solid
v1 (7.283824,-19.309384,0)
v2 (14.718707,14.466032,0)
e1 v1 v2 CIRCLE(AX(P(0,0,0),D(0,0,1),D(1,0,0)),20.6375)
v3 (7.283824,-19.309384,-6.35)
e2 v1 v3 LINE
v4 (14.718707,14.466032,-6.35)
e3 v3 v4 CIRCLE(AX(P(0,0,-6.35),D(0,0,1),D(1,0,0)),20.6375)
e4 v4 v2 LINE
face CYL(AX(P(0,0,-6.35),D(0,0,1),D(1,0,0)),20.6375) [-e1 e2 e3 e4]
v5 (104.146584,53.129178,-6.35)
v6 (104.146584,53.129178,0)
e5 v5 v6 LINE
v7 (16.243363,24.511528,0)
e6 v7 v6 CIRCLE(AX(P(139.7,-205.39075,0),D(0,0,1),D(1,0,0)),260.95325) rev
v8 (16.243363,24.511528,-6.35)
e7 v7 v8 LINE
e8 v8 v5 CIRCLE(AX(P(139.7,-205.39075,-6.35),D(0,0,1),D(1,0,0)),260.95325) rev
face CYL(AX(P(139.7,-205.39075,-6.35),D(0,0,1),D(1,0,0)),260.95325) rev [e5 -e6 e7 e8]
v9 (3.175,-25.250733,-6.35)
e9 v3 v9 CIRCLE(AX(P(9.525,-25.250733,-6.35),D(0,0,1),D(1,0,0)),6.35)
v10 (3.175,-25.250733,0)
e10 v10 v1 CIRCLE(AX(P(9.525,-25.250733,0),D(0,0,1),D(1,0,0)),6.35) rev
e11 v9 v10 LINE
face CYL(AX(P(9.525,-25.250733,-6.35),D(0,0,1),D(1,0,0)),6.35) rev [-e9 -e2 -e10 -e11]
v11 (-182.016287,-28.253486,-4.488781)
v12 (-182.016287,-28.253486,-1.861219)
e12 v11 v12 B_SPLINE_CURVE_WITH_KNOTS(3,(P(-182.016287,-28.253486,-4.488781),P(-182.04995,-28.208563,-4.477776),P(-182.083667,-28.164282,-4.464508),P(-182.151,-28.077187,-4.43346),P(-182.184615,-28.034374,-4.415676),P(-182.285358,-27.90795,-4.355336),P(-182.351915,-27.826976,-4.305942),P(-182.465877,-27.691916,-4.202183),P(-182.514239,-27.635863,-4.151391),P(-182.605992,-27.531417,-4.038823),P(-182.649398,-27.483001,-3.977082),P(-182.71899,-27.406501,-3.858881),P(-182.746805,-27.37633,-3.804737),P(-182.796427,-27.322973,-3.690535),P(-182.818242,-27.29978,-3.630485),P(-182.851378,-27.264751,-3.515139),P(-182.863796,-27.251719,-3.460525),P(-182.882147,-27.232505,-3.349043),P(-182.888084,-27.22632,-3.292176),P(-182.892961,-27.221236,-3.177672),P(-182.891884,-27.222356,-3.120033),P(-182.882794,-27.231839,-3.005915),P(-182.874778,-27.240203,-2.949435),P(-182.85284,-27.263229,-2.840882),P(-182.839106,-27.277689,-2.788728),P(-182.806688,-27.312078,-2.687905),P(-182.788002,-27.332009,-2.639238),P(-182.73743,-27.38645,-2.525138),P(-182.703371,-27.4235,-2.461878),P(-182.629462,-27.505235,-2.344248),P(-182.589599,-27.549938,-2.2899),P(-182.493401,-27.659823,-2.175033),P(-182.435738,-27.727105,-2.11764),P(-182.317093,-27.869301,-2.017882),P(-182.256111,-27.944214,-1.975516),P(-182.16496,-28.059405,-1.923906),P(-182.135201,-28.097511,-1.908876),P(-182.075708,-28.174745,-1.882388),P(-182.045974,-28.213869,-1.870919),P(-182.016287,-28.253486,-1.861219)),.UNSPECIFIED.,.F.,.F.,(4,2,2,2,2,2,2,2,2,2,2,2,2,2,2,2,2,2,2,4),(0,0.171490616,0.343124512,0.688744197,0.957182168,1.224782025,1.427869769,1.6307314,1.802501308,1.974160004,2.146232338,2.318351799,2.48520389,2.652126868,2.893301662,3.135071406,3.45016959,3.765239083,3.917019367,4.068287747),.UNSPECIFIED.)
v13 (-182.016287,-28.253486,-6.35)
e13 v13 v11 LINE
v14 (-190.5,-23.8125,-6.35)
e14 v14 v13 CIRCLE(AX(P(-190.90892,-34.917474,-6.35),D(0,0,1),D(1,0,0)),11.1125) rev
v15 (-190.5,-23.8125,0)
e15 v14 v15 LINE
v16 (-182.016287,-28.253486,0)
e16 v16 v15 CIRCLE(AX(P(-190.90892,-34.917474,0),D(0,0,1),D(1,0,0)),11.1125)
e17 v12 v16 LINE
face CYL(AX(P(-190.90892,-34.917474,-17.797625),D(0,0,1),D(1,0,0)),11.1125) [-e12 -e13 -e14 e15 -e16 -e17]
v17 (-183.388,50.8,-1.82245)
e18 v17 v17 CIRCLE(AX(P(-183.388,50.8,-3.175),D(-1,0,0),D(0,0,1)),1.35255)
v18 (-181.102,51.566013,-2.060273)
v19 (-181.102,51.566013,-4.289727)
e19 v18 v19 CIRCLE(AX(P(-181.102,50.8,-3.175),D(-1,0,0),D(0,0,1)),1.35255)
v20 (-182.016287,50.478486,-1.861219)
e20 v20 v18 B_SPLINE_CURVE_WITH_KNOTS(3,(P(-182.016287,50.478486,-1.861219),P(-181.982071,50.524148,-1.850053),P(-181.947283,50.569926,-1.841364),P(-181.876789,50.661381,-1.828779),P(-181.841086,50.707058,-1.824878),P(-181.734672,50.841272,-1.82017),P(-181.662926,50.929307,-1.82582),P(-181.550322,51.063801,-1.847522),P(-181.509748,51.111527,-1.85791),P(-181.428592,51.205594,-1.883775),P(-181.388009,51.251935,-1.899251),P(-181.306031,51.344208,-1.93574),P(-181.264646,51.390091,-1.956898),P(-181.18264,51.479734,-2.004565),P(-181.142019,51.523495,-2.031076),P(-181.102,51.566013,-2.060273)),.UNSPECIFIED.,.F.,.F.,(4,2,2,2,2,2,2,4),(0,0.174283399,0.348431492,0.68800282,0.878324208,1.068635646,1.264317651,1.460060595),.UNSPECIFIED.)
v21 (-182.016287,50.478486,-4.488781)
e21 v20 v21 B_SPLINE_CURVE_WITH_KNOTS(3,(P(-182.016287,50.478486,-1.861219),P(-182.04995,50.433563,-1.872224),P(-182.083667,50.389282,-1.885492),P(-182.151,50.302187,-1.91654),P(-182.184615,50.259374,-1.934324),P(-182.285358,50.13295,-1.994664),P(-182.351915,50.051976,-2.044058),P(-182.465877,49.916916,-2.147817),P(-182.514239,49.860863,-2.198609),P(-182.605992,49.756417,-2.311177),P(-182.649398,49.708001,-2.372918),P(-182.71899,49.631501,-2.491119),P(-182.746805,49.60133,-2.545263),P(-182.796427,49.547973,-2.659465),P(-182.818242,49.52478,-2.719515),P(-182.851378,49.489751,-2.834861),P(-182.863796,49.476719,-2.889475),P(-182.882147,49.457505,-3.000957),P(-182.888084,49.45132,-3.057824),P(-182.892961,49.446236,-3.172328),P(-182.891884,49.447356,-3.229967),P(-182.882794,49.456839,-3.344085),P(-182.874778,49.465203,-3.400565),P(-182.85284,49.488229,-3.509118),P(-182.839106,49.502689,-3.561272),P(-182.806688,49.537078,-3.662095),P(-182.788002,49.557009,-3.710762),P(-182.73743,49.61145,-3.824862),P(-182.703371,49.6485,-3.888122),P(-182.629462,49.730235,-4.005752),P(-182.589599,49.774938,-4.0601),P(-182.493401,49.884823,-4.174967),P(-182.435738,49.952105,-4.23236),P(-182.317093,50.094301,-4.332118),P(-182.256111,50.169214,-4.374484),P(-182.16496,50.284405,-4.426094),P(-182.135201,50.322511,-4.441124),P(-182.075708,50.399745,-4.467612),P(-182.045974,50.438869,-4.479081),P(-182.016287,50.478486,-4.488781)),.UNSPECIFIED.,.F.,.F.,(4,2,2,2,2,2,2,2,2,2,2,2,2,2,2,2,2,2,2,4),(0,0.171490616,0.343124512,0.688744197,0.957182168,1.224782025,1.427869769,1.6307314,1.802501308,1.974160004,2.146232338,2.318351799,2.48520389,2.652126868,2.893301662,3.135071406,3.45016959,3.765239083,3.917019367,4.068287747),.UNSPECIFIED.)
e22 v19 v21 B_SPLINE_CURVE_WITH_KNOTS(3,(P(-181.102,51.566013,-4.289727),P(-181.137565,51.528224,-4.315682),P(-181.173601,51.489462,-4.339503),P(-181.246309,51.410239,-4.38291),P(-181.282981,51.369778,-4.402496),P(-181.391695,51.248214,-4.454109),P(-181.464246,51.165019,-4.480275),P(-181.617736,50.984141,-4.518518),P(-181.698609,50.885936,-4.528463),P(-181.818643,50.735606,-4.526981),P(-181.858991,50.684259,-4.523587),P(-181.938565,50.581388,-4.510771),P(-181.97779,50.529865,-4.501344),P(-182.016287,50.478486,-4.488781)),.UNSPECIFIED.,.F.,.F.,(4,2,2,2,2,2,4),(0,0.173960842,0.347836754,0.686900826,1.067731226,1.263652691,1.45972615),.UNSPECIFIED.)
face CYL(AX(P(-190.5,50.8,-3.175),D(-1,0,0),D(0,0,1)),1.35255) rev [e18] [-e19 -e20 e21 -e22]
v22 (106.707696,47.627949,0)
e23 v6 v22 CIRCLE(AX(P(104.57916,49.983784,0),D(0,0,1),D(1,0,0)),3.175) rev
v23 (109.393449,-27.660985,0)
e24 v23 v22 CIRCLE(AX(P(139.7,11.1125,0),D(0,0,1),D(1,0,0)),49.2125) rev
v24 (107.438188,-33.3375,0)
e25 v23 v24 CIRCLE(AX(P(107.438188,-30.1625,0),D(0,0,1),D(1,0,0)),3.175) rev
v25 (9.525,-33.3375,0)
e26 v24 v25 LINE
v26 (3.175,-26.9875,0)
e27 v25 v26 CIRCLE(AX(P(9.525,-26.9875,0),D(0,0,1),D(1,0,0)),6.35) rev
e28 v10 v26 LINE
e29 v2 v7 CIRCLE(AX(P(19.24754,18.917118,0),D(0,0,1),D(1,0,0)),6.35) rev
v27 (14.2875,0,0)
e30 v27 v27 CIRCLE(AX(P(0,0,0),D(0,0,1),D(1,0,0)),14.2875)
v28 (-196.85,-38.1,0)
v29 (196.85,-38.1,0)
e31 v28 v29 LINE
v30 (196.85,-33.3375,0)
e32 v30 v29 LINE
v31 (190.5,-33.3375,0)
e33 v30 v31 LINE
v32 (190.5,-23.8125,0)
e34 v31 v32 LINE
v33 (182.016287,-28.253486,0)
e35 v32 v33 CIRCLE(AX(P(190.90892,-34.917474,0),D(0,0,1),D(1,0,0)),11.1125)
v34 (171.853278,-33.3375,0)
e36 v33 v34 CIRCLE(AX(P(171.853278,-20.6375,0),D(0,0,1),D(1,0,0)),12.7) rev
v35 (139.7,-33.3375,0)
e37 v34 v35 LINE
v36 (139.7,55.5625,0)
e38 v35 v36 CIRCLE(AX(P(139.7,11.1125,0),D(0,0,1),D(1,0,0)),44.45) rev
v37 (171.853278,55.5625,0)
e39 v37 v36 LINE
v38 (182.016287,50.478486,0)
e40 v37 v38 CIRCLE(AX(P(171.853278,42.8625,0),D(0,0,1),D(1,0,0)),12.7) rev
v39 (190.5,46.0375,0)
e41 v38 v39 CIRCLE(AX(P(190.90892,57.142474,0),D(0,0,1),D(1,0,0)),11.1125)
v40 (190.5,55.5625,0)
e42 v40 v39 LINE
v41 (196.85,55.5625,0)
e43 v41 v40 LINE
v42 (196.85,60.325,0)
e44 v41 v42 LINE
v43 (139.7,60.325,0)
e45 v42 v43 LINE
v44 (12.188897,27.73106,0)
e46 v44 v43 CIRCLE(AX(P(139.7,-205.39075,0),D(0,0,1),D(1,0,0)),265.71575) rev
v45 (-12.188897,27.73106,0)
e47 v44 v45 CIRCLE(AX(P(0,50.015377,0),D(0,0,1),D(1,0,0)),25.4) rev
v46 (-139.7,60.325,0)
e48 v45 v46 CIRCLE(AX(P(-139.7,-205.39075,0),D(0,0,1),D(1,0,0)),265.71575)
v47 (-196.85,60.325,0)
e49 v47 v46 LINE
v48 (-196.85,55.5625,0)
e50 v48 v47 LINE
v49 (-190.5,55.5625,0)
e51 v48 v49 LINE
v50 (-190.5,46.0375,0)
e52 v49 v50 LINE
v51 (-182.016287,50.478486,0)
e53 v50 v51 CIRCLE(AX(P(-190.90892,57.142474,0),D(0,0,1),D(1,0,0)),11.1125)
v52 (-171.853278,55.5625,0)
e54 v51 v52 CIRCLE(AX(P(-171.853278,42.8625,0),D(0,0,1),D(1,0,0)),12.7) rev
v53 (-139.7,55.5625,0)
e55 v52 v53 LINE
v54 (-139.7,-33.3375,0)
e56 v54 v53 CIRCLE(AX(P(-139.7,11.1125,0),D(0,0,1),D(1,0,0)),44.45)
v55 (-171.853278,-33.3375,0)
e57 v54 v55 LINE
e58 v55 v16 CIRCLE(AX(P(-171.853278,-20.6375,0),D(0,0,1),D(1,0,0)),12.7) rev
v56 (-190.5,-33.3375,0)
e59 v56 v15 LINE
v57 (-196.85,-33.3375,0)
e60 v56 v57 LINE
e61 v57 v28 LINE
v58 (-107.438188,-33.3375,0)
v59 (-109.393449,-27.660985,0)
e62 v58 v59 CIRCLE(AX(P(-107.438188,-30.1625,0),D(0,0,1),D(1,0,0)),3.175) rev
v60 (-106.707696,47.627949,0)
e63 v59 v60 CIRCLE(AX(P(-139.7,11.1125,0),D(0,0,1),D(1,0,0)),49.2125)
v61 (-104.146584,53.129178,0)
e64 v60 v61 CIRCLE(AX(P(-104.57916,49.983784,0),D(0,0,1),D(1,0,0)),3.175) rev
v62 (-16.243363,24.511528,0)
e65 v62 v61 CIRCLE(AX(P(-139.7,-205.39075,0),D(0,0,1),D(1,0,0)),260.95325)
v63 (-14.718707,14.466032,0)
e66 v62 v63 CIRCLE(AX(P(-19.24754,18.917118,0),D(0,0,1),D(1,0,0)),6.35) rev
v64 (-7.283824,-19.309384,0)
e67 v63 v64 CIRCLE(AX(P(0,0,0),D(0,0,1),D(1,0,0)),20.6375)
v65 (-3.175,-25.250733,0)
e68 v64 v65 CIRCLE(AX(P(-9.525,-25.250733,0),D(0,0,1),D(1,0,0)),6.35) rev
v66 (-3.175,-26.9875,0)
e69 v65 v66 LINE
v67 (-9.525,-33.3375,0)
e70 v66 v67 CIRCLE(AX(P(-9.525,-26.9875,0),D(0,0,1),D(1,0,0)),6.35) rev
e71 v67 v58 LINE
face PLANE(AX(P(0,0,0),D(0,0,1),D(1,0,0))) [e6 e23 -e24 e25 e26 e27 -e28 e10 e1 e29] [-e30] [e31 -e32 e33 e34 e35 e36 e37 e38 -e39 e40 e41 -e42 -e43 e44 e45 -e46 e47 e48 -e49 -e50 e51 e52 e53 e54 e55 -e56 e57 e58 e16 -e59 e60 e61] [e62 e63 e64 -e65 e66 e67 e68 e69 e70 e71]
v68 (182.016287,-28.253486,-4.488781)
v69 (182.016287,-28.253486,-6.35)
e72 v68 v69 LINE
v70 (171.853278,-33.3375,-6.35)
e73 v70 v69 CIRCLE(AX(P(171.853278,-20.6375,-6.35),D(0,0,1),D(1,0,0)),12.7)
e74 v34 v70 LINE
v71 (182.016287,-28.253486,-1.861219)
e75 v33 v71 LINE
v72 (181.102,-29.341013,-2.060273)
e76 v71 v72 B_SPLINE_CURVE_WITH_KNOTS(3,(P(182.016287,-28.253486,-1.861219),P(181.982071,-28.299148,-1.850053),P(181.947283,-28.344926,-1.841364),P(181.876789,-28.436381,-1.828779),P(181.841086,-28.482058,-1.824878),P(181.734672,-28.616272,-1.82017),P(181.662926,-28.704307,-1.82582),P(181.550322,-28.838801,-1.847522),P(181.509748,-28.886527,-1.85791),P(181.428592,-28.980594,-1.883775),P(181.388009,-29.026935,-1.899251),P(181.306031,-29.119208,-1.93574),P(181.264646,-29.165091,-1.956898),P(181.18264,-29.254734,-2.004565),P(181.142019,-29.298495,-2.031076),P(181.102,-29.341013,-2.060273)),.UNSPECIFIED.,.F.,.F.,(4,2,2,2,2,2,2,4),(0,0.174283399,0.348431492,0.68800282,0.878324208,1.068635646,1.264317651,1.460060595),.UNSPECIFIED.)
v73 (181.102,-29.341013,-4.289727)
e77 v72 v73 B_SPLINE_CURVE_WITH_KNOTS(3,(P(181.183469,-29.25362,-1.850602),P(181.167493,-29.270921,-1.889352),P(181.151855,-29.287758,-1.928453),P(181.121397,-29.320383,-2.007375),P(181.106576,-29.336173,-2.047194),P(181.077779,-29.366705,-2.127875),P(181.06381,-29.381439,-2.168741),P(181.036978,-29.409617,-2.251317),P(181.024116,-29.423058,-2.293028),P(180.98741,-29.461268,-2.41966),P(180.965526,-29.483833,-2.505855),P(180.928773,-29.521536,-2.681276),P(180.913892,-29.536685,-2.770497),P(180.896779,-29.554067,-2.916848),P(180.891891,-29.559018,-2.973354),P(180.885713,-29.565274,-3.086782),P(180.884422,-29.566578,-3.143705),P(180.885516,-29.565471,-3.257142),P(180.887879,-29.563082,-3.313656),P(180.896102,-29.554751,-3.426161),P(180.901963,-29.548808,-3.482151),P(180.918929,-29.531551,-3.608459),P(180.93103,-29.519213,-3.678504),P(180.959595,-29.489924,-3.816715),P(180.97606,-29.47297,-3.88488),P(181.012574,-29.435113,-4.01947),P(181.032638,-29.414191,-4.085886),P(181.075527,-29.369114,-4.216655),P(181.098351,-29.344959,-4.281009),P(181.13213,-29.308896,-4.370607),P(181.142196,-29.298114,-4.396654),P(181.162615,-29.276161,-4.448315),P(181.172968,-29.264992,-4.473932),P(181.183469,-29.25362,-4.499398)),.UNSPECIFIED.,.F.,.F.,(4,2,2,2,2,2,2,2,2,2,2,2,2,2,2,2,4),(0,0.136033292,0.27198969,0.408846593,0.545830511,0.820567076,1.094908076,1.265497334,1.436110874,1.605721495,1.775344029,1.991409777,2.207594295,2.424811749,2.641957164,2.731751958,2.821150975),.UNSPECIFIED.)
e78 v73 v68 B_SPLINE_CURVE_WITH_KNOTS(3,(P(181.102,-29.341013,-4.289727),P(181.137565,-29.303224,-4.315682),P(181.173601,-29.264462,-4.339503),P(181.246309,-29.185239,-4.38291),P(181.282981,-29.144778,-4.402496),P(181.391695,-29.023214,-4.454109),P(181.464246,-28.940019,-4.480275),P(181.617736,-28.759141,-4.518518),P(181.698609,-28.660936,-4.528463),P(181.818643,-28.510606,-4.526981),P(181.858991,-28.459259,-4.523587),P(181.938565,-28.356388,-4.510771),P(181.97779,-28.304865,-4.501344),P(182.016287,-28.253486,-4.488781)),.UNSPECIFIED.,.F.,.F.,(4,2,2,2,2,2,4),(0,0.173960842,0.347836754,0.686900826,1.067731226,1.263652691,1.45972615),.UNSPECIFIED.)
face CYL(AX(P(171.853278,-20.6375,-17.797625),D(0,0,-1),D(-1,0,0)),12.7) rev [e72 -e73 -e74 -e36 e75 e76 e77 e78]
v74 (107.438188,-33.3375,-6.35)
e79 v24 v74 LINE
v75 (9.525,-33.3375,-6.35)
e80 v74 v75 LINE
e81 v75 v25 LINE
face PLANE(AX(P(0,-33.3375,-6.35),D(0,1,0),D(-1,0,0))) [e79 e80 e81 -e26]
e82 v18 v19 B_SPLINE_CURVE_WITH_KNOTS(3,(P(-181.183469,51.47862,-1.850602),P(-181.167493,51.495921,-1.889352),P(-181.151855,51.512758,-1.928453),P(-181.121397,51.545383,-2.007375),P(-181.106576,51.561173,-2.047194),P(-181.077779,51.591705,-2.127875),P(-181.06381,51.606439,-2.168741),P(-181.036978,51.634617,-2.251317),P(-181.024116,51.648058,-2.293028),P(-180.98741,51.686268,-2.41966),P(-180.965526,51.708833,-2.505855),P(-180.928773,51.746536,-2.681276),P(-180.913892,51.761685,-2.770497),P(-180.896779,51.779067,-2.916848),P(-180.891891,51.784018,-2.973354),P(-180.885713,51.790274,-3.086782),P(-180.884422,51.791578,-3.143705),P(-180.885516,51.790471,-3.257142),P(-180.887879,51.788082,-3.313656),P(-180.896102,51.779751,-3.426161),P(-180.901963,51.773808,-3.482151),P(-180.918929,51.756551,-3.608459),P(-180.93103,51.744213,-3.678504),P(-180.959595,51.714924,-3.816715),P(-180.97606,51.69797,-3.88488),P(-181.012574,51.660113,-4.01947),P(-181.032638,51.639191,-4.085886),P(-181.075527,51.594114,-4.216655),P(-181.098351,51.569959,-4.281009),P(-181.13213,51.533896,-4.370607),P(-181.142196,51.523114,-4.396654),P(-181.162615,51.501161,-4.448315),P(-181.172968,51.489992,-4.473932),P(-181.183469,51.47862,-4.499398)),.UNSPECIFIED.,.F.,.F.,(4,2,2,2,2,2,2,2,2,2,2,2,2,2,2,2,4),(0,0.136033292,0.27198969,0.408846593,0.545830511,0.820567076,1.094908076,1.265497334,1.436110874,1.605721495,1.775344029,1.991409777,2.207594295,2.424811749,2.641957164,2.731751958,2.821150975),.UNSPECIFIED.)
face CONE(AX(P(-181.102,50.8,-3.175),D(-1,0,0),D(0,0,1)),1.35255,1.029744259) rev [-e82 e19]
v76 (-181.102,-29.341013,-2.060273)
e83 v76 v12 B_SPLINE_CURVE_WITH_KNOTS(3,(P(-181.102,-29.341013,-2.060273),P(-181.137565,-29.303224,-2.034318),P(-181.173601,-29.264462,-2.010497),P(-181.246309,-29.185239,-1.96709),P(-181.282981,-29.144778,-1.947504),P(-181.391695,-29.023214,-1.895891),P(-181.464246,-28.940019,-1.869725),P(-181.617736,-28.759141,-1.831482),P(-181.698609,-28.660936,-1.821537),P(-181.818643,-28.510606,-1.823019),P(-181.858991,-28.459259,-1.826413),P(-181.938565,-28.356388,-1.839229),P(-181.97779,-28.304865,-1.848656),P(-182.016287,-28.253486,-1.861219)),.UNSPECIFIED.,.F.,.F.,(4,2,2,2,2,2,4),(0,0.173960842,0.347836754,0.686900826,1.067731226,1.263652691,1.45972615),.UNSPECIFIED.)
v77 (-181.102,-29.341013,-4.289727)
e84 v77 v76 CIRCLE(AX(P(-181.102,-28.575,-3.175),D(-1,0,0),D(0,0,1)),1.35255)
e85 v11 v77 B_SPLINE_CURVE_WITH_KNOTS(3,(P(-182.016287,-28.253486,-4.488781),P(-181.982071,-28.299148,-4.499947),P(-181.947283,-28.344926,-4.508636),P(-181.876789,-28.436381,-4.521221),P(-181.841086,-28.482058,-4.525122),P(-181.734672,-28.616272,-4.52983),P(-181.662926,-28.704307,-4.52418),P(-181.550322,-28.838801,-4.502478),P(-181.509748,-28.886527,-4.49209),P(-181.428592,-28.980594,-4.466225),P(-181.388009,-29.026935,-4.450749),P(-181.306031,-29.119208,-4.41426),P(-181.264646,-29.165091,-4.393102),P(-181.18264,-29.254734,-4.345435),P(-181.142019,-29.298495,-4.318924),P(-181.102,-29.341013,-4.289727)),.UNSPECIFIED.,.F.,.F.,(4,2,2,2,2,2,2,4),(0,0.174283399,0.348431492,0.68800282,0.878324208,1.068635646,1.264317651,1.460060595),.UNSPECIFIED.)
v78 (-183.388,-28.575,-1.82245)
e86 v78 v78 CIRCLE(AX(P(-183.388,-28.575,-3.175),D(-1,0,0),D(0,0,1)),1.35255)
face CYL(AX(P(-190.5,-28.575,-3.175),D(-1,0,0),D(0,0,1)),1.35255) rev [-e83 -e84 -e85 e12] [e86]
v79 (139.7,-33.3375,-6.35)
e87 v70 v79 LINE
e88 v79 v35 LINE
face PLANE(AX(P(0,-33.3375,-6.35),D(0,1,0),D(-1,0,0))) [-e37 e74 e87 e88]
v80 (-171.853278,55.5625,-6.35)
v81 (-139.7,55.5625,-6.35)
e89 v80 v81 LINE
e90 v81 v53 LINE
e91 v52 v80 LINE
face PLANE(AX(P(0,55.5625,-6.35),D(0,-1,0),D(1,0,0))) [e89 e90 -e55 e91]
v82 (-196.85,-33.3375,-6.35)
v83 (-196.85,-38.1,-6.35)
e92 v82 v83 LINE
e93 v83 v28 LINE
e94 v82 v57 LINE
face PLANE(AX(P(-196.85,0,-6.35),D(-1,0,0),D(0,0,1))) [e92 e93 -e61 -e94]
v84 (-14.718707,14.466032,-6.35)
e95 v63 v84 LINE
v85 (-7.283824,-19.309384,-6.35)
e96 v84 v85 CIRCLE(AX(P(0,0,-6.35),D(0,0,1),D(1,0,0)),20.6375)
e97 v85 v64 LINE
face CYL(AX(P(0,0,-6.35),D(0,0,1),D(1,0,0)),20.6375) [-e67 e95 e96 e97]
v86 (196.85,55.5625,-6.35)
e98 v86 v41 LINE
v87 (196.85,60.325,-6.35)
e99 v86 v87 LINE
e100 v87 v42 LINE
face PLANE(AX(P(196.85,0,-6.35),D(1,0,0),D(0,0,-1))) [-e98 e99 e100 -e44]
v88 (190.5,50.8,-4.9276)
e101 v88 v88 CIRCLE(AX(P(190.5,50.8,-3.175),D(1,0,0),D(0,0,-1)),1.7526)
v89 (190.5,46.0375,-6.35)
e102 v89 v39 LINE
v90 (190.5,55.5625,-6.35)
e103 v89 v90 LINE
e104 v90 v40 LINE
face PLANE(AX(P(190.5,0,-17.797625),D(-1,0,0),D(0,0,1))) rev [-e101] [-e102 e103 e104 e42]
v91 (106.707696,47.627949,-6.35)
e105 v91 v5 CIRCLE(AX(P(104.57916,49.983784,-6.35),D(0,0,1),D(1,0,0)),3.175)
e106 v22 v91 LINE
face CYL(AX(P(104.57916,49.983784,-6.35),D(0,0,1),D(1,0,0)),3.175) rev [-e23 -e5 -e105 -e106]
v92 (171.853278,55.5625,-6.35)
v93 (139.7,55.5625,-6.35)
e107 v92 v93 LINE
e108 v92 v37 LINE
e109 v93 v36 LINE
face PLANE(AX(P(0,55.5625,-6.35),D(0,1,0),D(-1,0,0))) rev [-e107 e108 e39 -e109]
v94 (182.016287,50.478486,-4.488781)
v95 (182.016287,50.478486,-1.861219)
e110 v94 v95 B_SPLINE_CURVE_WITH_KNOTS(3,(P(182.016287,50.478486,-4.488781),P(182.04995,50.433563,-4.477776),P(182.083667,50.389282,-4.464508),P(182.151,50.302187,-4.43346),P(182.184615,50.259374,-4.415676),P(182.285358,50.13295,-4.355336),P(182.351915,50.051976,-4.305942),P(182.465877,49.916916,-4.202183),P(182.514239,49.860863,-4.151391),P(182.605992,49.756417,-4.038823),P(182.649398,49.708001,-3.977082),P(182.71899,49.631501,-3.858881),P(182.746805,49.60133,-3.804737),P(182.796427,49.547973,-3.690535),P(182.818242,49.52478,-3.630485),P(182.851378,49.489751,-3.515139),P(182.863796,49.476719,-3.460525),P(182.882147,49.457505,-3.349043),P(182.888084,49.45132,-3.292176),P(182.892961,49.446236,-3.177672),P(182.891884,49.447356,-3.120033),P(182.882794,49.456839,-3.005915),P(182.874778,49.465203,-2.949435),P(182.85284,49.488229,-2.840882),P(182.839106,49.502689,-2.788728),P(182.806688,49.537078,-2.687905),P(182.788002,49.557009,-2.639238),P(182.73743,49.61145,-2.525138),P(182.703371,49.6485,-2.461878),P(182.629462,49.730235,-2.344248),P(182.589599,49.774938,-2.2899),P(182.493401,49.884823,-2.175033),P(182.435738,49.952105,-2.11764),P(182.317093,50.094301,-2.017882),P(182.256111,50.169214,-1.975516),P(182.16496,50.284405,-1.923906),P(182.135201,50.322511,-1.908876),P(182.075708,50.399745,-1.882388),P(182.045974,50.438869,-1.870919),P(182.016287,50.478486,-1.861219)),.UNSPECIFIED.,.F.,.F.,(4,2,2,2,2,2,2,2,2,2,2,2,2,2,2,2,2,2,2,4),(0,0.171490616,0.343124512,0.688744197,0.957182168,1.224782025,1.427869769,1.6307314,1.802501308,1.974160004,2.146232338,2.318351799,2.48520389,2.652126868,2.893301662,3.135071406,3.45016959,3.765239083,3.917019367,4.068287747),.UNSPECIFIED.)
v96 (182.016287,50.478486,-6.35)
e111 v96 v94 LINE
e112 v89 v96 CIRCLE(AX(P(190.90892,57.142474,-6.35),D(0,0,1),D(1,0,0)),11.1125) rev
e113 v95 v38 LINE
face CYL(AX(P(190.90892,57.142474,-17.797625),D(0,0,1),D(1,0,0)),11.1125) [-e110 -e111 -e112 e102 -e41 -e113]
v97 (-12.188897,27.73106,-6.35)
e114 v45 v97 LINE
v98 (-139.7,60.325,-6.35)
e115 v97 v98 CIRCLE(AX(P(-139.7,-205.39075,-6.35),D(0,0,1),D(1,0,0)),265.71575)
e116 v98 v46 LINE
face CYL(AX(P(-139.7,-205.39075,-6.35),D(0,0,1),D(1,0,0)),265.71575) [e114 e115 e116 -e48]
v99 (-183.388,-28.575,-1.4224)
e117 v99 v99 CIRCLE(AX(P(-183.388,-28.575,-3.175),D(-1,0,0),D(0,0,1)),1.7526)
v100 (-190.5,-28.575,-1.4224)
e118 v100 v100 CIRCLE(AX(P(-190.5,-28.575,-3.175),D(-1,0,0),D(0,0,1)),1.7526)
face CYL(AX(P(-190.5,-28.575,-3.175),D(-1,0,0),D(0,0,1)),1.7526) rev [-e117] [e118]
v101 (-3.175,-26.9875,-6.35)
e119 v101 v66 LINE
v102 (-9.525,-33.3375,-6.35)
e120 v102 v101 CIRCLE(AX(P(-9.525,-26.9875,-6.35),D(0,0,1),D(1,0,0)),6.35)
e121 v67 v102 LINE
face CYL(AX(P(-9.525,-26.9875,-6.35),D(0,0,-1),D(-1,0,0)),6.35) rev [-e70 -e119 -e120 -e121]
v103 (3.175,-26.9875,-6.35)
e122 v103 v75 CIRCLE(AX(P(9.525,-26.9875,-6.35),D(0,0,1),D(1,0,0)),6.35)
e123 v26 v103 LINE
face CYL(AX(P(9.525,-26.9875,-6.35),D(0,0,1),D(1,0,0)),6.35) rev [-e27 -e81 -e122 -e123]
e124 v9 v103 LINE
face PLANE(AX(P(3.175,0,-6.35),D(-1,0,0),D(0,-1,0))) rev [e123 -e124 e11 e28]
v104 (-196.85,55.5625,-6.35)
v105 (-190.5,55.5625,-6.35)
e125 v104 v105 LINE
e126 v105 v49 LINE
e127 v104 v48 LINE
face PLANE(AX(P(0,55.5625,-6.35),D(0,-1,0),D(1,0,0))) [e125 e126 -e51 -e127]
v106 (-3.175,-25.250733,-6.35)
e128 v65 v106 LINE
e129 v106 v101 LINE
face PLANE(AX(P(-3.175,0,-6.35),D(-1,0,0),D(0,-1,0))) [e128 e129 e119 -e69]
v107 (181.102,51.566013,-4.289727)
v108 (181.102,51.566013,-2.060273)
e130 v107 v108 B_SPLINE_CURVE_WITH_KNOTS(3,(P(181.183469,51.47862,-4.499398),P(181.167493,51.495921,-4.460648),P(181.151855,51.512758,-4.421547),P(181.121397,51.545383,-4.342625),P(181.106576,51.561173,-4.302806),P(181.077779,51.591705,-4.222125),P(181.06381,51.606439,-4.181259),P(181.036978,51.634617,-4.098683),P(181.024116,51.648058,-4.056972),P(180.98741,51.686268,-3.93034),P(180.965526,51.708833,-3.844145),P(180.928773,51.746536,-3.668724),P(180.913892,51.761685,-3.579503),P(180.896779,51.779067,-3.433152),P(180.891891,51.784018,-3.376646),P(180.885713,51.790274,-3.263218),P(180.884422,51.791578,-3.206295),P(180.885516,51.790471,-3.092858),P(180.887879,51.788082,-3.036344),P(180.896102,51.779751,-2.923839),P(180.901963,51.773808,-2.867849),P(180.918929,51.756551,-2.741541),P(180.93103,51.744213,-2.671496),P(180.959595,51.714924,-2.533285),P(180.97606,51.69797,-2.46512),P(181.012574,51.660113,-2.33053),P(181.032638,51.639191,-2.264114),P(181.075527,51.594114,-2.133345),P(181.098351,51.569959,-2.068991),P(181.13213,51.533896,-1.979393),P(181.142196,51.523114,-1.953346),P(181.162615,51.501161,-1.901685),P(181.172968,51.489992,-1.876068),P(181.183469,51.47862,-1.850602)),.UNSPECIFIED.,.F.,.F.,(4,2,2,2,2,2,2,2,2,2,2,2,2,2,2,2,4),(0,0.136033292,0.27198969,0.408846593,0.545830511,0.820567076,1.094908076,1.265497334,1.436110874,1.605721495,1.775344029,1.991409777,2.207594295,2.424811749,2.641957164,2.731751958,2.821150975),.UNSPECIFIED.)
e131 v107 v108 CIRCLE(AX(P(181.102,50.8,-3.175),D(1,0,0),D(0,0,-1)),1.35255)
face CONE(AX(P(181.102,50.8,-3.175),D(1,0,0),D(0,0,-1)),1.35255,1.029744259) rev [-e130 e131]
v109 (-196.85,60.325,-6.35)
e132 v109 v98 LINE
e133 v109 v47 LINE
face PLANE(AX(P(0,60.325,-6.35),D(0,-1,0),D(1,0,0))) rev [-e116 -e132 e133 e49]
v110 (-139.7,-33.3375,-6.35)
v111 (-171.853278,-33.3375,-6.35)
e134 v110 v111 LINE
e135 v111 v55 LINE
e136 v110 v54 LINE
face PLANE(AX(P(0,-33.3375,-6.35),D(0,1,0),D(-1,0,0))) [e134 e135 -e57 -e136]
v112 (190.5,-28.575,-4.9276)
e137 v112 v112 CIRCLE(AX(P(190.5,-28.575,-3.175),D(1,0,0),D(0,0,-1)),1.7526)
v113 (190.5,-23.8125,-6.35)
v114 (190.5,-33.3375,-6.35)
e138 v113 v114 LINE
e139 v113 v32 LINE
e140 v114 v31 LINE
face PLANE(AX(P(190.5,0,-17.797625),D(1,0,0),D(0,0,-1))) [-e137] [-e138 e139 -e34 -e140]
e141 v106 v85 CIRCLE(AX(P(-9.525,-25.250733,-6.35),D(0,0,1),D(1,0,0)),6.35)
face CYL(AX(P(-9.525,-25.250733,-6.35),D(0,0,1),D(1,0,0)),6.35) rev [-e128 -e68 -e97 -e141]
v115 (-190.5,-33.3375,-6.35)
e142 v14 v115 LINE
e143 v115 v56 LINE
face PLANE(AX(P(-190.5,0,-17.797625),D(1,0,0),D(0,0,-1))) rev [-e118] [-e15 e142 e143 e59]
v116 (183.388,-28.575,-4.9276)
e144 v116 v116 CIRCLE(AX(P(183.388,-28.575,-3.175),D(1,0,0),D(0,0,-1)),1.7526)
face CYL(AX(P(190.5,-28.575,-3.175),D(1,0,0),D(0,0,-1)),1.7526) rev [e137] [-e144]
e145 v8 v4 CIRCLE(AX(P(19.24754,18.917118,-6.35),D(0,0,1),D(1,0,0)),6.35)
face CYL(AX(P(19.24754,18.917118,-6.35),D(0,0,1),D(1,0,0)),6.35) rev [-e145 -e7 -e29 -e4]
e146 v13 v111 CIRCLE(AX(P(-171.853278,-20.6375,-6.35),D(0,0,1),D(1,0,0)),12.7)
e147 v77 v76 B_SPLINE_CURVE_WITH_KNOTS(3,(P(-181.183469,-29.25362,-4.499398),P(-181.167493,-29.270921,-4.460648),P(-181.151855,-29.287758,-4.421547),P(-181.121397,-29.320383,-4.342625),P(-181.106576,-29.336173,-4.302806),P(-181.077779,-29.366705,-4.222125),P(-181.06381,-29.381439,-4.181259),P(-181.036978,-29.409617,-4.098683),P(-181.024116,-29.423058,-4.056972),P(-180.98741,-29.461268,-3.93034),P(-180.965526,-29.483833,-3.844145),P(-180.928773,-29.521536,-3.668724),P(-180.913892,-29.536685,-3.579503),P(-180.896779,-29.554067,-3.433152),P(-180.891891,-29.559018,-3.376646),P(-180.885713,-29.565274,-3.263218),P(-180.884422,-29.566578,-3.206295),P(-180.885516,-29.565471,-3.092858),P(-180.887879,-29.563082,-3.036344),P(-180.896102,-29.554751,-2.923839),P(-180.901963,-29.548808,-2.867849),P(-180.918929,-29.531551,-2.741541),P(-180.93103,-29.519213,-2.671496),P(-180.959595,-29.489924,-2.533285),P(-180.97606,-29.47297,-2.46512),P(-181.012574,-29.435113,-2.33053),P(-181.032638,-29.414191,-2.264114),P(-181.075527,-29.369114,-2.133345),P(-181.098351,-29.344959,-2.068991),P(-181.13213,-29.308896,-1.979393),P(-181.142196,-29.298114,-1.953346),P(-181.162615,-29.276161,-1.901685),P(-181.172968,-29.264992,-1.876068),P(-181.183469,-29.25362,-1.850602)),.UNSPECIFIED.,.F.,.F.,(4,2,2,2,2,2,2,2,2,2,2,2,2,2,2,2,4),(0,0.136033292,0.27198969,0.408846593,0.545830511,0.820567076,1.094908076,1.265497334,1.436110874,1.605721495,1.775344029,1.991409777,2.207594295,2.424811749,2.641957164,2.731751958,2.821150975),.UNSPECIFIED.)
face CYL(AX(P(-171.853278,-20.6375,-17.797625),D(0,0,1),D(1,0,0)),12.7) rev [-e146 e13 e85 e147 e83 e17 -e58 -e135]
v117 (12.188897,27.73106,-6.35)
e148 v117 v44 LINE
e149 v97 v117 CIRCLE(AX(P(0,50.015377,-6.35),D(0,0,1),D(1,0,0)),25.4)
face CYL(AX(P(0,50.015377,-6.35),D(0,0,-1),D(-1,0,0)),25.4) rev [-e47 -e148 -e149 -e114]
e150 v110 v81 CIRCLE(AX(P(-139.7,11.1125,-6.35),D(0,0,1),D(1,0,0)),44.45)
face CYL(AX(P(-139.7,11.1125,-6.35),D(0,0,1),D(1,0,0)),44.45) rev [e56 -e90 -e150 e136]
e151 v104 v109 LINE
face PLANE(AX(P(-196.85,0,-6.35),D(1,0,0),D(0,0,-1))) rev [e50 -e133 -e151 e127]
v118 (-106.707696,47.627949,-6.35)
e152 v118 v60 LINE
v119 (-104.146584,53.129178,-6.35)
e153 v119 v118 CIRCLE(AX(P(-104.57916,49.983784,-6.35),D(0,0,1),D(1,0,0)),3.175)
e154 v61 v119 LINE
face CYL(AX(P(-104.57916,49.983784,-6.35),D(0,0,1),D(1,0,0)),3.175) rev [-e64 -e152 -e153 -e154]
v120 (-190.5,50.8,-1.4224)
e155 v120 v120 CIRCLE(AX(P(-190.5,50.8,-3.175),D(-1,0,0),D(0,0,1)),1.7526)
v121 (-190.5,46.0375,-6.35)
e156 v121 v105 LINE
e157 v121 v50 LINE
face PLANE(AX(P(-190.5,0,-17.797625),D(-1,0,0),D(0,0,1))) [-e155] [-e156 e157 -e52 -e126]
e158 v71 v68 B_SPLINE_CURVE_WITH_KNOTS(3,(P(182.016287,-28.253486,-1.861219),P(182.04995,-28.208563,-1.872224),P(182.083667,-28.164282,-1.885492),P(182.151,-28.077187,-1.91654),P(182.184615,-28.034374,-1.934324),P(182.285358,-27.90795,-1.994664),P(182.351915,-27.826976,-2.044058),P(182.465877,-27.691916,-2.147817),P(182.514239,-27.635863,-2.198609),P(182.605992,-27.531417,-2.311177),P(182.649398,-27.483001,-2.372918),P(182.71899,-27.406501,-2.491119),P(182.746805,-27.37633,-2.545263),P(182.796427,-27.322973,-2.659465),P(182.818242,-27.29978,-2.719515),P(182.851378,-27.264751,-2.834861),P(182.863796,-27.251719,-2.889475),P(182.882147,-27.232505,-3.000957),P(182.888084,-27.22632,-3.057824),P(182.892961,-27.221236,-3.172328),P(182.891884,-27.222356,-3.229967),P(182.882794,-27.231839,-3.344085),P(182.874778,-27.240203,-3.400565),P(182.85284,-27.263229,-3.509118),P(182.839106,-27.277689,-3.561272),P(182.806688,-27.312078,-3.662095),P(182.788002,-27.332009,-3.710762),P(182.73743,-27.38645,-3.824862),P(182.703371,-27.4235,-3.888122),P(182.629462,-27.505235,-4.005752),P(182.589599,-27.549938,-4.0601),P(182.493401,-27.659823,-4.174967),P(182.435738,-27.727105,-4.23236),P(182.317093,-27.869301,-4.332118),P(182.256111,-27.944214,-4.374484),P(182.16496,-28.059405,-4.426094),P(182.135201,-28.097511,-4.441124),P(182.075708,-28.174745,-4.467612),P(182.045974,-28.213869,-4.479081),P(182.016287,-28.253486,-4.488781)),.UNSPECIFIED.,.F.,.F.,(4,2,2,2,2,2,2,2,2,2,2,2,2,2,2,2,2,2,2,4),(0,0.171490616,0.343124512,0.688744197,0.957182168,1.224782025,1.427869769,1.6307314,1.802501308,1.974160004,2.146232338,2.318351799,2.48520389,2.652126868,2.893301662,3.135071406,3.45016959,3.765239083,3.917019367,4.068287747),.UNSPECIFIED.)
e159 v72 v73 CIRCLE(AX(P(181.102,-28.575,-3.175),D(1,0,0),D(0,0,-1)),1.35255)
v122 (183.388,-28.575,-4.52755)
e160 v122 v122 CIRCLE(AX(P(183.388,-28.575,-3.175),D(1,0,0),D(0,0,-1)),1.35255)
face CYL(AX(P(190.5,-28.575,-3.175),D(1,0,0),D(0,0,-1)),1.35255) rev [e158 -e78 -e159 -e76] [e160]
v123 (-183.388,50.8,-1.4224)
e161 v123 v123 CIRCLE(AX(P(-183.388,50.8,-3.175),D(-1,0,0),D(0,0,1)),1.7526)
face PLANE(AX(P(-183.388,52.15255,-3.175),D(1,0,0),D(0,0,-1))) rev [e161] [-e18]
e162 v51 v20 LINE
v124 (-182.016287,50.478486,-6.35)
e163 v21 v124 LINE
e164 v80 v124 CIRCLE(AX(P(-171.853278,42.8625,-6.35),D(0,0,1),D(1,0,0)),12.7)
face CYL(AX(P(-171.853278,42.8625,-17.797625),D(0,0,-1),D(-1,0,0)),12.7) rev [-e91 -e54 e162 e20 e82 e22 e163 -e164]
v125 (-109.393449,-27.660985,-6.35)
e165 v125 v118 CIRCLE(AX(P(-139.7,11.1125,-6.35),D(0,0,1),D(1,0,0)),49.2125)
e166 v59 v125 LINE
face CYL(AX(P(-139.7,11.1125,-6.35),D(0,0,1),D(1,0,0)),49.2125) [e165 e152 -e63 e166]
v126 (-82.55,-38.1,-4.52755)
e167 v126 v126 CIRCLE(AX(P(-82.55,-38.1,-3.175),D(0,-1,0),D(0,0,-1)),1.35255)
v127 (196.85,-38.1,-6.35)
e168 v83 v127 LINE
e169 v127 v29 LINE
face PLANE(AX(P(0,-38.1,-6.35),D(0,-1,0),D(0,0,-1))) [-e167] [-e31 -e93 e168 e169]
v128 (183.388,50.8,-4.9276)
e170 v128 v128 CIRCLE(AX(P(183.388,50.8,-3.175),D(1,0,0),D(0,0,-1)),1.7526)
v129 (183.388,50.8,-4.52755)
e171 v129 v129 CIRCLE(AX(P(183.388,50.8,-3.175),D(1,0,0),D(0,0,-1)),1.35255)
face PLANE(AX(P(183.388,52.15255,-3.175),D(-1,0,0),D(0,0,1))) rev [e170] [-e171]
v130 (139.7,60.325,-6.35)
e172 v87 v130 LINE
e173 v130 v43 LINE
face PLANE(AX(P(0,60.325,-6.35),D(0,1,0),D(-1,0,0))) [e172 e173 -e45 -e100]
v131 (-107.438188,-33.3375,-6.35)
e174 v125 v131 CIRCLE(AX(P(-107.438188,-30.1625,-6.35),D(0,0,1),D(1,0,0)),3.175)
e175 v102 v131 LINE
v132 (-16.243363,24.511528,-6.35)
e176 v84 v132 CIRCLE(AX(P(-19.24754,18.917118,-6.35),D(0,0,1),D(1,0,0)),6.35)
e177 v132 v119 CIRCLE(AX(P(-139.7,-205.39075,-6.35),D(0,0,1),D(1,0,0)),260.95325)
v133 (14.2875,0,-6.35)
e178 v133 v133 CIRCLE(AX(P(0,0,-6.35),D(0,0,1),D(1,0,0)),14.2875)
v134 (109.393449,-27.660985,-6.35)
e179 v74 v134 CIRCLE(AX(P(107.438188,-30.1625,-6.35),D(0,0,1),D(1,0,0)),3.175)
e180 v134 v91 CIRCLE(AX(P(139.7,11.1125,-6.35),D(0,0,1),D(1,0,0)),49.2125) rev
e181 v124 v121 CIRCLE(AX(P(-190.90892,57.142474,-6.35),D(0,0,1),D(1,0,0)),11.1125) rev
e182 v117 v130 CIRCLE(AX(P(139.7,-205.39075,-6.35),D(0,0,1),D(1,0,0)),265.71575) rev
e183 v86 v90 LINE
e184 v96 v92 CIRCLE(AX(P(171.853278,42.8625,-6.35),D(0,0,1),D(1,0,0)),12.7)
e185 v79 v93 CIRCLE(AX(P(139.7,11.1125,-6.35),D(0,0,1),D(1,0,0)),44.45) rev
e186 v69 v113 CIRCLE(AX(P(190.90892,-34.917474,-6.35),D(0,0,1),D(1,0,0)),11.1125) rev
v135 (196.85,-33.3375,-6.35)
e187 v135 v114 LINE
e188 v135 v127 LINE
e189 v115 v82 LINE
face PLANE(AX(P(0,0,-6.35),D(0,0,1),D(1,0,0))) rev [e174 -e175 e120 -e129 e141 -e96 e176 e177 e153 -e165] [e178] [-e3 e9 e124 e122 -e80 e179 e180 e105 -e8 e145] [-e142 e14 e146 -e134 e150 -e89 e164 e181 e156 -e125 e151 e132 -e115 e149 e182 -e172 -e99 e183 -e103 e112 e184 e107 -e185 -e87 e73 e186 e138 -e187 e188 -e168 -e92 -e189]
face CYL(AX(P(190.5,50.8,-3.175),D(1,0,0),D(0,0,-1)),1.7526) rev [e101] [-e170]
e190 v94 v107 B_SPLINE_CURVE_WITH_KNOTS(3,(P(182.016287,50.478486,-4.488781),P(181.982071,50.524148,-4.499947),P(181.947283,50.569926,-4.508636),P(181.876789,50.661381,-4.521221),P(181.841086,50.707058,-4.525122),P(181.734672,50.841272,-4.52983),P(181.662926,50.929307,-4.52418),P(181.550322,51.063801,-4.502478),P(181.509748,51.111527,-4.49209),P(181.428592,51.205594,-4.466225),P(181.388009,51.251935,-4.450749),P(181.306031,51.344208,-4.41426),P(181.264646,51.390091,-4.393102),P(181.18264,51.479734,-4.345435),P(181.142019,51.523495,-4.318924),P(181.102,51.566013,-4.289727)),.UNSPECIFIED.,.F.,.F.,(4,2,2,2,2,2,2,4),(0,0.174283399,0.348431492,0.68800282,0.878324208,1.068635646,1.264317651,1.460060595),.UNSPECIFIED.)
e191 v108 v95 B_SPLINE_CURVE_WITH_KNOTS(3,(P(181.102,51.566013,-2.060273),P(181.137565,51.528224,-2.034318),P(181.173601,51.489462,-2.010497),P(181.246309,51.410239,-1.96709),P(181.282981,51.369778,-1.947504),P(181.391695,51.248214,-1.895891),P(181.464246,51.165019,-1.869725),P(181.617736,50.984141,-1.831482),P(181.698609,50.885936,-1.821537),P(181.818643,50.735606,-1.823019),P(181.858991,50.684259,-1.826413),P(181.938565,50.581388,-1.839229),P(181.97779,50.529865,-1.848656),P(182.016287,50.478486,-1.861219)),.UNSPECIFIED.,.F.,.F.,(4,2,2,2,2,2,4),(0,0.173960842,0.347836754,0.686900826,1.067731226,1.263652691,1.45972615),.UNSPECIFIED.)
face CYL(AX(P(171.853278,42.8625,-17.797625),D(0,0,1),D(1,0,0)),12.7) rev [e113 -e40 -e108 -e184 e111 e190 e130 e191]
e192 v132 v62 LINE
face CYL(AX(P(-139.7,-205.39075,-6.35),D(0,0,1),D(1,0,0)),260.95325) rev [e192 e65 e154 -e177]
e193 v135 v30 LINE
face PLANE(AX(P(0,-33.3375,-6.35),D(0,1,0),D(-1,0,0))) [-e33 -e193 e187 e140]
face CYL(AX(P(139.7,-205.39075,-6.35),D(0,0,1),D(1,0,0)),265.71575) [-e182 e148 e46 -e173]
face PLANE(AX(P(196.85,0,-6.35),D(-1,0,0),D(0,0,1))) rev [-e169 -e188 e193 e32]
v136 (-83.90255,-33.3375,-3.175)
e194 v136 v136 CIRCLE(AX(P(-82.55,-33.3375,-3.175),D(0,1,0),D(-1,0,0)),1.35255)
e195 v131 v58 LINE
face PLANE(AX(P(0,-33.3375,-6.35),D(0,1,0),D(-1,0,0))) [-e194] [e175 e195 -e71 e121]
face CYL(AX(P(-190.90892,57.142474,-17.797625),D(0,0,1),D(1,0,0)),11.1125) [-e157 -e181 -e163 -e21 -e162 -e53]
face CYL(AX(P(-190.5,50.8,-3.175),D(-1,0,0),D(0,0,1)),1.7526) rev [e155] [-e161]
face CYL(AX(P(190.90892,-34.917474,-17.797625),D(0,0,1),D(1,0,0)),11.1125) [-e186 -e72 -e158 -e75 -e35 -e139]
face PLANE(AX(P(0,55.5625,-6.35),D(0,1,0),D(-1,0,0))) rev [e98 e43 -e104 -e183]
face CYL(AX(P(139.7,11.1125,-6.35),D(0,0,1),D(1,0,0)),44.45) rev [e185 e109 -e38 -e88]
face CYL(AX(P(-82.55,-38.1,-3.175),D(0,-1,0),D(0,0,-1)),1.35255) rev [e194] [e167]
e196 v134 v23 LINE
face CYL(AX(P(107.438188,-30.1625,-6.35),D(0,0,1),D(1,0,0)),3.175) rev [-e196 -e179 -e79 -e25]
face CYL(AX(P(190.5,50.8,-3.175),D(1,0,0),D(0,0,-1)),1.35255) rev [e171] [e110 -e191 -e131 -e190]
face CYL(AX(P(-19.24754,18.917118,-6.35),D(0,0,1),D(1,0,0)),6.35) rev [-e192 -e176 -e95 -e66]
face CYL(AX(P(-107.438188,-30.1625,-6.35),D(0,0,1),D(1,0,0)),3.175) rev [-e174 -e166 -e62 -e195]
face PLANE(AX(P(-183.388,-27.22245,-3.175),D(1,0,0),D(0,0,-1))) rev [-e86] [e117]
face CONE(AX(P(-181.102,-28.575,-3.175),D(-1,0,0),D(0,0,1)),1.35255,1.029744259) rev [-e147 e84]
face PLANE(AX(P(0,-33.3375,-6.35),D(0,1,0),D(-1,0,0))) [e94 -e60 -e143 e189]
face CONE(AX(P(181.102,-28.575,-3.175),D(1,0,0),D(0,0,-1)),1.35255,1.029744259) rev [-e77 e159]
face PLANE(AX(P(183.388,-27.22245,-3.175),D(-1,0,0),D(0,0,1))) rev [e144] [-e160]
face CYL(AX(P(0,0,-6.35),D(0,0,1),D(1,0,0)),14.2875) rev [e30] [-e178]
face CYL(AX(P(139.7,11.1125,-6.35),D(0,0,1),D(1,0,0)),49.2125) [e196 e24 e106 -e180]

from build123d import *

# Parameters (mm, degrees)
SKETCH1_W                      = 6.35
SKETCH1_H                      = 4.7625
SKETCH1_R                      = 20.6375
SKETCH1_R_2                    = 14.2875
BOSS_EXTRUDE1_DEPTH            = 6.35
SKETCH2_W                      = 6.35
SKETCH2_H                      = 9.525
BOSS_EXTRUDE2_DEPTH            = 6.35
FILLET1_R                      = 12.7
FILLET2_R                      = 11.1125
F_6_32_TAPPED_HOLE1_D          = 2.7051
F_6_32_TAPPED_HOLE1_DEPTH      = 9.398
F_6_32_TAPPED_HOLE1_TIP        = 0.81269403
FILLET3_R                      = 25.4
FILLET4_R                      = 6.35
FILLET5_R                      = 3.175
F_6_32_TAPPED_HOLE2_AT_2_COUNT = 2
F_6_32_TAPPED_HOLE2_AT_2_PITCH = 79.375


with BuildPart() as part:
    # Sketch1 → Boss-Extrude1 (new body)
    # profile 1 of 11: a face of its own
    with BuildSketch(Plane.XY):
        with Locations((-193.675, -35.71875)):
            Rectangle(SKETCH1_W, SKETCH1_H)
    # profile 2 of 11: a face of its own
    with BuildSketch(Plane.XY):
        Polygon((190.5, -38.1), (190.5, -33.3375), (-118.579686171, -33.3375), (-190.5, -33.3375), (-190.5, -38.1), align=None)
    # profile 3 of 11: a face of its own
    with BuildSketch(Plane.XY):
        with BuildLine():
            ThreePointArc((-139.7, 55.5625), (-95.25, 11.1125), (-139.7, -33.3375))
            Line((-139.7, -33.3375), (-118.579686171, -33.3375))
            ThreePointArc((-118.579686171, -33.3375), (-90.5008099, 9.968013342), (-116.535631077, 54.53233612))
            ThreePointArc((-116.535631077, 54.53233612), (-128.106367855, 55.304831818), (-139.7, 55.5625))
        make_face()
    # profile 4 of 11: a face of its own
    with BuildSketch(Plane.XY):
        with Locations((-193.675, 57.94375)):
            Rectangle(SKETCH1_W, SKETCH1_H)
    # profile 5 of 11: a face of its own
    with BuildSketch(Plane.XY):
        with BuildLine():
            Line((-190.5, 55.5625), (-139.7, 55.5625))
            ThreePointArc((-139.7, 55.5625), (-128.106367855, 55.304831818), (-116.535631077, 54.53233612))
            ThreePointArc((-116.535631077, 54.53233612), (-59.866243781, 43.050732151), (-7.116346533, 19.371732454))
            ThreePointArc((-7.116346533, 19.371732454), (-3.614019765, 20.318594129), (0, 20.6375))
            ThreePointArc((0, 20.6375), (-67.085973021, 50.210624965), (-139.7, 60.325))
            Line((-139.7, 60.325), (-190.5, 60.325))
            Line((-190.5, 60.325), (-190.5, 55.5625))
        make_face()
    # profile 6 of 11: a face of its own
    with BuildSketch(Plane.XY):
        Circle(SKETCH1_R)
        Circle(SKETCH1_R_2, mode=Mode.SUBTRACT)
    # profile 7 of 11: a face of its own
    with BuildSketch(Plane.XY):
        with BuildLine():
            Line((-3.175, -33.3375), (3.175, -33.3375))
            Line((3.175, -33.3375), (3.175, -20.391806719))
            ThreePointArc((3.175, -20.391806719), (0, -20.6375), (-3.175, -20.391806719))
            Line((-3.175, -20.391806719), (-3.175, -33.3375))
        make_face()
    # profile 8 of 11: a face of its own
    with BuildSketch(Plane.XY):
        with BuildLine():
            ThreePointArc((116.535631077, 54.53233612), (128.106367855, 55.304831818), (139.7, 55.5625))
            Line((139.7, 55.5625), (190.5, 55.5625))
            Line((190.5, 55.5625), (190.5, 60.325))
            Line((190.5, 60.325), (139.7, 60.325))
            ThreePointArc((139.7, 60.325), (67.085973021, 50.210624965), (0, 20.6375))
            ThreePointArc((0, 20.6375), (3.614019765, 20.318594129), (7.116346533, 19.371732454))
            ThreePointArc((7.116346533, 19.371732454), (59.866243781, 43.050732151), (116.535631077, 54.53233612))
        make_face()
    # profile 9 of 11: a face of its own
    with BuildSketch(Plane.XY):
        with BuildLine():
            Line((118.579686171, -33.3375), (139.7, -33.3375))
            ThreePointArc((139.7, -33.3375), (95.25, 11.1125), (139.7, 55.5625))
            ThreePointArc((139.7, 55.5625), (128.106367855, 55.304831818), (116.535631077, 54.53233612))
            ThreePointArc((116.535631077, 54.53233612), (90.5008099, 9.968013342), (118.579686171, -33.3375))
        make_face()
    # profile 10 of 11: a face of its own
    with BuildSketch(Plane.XY):
        with Locations((193.675, 57.94375)):
            Rectangle(SKETCH1_W, SKETCH1_H)
    # profile 11 of 11: a face of its own
    with BuildSketch(Plane.XY):
        with Locations((193.675, -35.71875)):
            Rectangle(SKETCH1_W, SKETCH1_H)
    extrude(amount=-BOSS_EXTRUDE1_DEPTH)

    # Sketch2 → Boss-Extrude2 (add)
    with BuildSketch(Plane.XY):
        with Locations((-187.325, -28.575)):
            Rectangle(SKETCH2_W, SKETCH2_H)
        with Locations((-187.325, 50.8)):
            Rectangle(SKETCH2_W, SKETCH2_H)
        with Locations((187.325, 50.8)):
            Rectangle(SKETCH2_W, SKETCH2_H)
        with Locations((187.325, -28.575)):
            Rectangle(SKETCH2_W, SKETCH2_H)
    extrude(amount=-BOSS_EXTRUDE2_DEPTH)

    # Fillet1
    # the kernel refuses this fillet: 12.7 mm, written as the material it adds along each edge
    with BuildSketch(Plane(origin=(-184.15, 55.5625, 0), x_dir=(1, 0, 0), z_dir=(0, 0, -1)), Plane(origin=(184.15, -33.3375, 0), x_dir=(-1, 0, 0), z_dir=(0, 0, -1))) as fillet1_piece_1:
        with BuildLine():
            CenterArc((12.296722124, 12.7), FILLET1_R, 194.477512186, 75.522487814)
            Line((0, 9.525), (-0.245934442, 9.4615))
            ThreePointArc((-0.245934442, 9.4615), (-0.254, 4.7625), (-0.254, 0))
            Line((-0.254, 0), (0, -0.254))
            Line((0, -0.254), (12.296722124, -0.254))
            Line((12.296722124, -0.254), (12.296722124, 0))
        make_face()
    extrude(amount=6.35)
    with BuildSketch(Plane(origin=(184.15, 55.5625, 0), x_dir=(-1, 0, 0), z_dir=(0, 0, -1)), Plane(origin=(-184.15, -33.3375, 0), x_dir=(1, 0, 0), z_dir=(0, 0, -1))) as fillet1_piece_2:
        with BuildLine():
            CenterArc((12.296722124, -12.7), FILLET1_R, 90, 75.522487814)
            Line((0, -9.525), (-0.245934442, -9.4615))
            ThreePointArc((-0.245934442, -9.4615), (-0.254, -4.7625), (-0.254, 0))
            Line((-0.254, 0), (0, 0.254))
            Line((0, 0.254), (12.296722124, 0.254))
            Line((12.296722124, 0.254), (12.296722124, 0))
        make_face()
    extrude(amount=6.35)

    # Fillet2
    # the kernel refuses this fillet: 11.1125 mm, written as the material it takes off along each edge
    with BuildSketch(Plane(origin=(184.15, -23.8125, 15.875), x_dir=(-0.43306748122172567, -0.9013615016785831, 0), z_dir=(0, 0, -1)), Plane(origin=(-184.15, 46.0375, 15.875), x_dir=(0.43306748122172517, 0.9013615016785834, 0), z_dir=(0, 0, -1))) as fillet2_piece_1:
        with BuildLine():
            CenterArc((7.082527166, -10.901433526), FILLET2_R, 101.184876129, 51.043876357)
            Line((-2.749978506, -5.723645536), (-2.946628619, -5.620089776))
            ThreePointArc((-2.946628619, -5.620089776), (-1.575316847, -2.76557352), (-0.200327594, 0.096249248))
            Line((-0.200327594, 0.096249248), (0.043111035, 0.218028671))
            ThreePointArc((0.043111035, 0.218028671), (2.46348771, -0.018968828), (4.883864385, 0.218028671))
            Line((4.883864385, 0.218028671), (4.92697542, 0))
        make_face()
    extrude(amount=38.1, mode=Mode.SUBTRACT)
    with BuildSketch(Plane(origin=(184.15, 46.0375, 15.875), x_dir=(1, 0, 0), z_dir=(0, 0, -1)), Plane(origin=(-184.15, -23.8125, 15.875), x_dir=(-1, 0, 0), z_dir=(0, 0, -1))) as fillet2_piece_2:
        with BuildLine():
            CenterArc((6.758920293, -11.10497368), FILLET2_R, 92.108859198, 51.043876357)
            Line((-2.133712835, -4.440985963), (-2.311565498, -4.307706209))
            ThreePointArc((-2.311565498, -4.307706209), (-1.049758647, -2.228707764), (-0.215192637, 0.0555625))
            Line((-0.215192637, 0.0555625), (0, 0.22225))
            ThreePointArc((0, 0.22225), (3.175, 0.22225), (6.341821594, 0.222099474))
            Line((6.341821594, 0.222099474), (6.35, 0))
        make_face()
    extrude(amount=38.1, mode=Mode.SUBTRACT)

    # #6-32 Tapped Hole1
    with Locations(Plane(origin=(0, -38.1, 0), x_dir=(-1, 0, 0), z_dir=(0, -1, 0))):
        with Locations((82.55, 3.175)):
            Hole(F_6_32_TAPPED_HOLE1_D / 2, depth=F_6_32_TAPPED_HOLE1_DEPTH)
            with Locations((0, 0, -(F_6_32_TAPPED_HOLE1_DEPTH + F_6_32_TAPPED_HOLE1_TIP / 2))):  # 118° drill point
                Cone(0, F_6_32_TAPPED_HOLE1_D / 2, F_6_32_TAPPED_HOLE1_TIP, mode=Mode.SUBTRACT)

    # Fillet3
    fillet3_edges = [part.edges().sort_by_distance(p)[0] for p in [
        (0, 20.6375, -3.175),
    ]]
    fillet(fillet3_edges, radius=FILLET3_R)

    # Fillet4
    fillet4_edges = [part.edges().sort_by_distance(p)[0] for p in [
        (3.175, -20.391806719, -3.175),
        (3.175, -33.3375, -3.175),
        (7.116346533, 19.371732454, -3.175),
        (-3.175, -33.3375, -3.175),
        (-3.175, -20.391806719, -3.175),
        (-7.116346533, 19.371732454, -3.175),
    ]]
    fillet(fillet4_edges, radius=FILLET4_R)

    # Fillet5
    fillet5_edges = [part.edges().sort_by_distance(p)[0] for p in [
        (118.579686171, -33.3375, -3.175),
        (116.535631077, 54.53233612, -3.175),
        (-116.535631077, 54.53233612, -3.175),
        (-118.579686171, -33.3375, -3.175),
    ]]
    fillet(fillet5_edges, radius=FILLET5_R)

    # Sketch7 → #6-32 Tapped Hole2 (revolve, cut)
    with BuildSketch(Plane(origin=(190.5, -28.575, -3.175), x_dir=(0, 0, -1), z_dir=(0, 1, 0))):
        Polygon((0, 0), (0, 10.21069403), (1.35255, 9.398), (1.35255, 7.112), (1.7526, 7.112), (1.7526, 0), align=None)
    f_6_32_tapped_hole2 = revolve(axis=Axis((196.85, -28.575, -3.175), (-1, 0, 0)), mode=Mode.SUBTRACT)

    # #6-32 Tapped Hole2 at 2: #6-32 Tapped Hole2 ×2
    with Locations(*[(0, i * F_6_32_TAPPED_HOLE2_AT_2_PITCH, 0) for i in range(1, F_6_32_TAPPED_HOLE2_AT_2_COUNT)]):
        add(f_6_32_tapped_hole2, mode=Mode.SUBTRACT)

    # Mirror1: #6-32 Tapped Hole2 across plane
    add(f_6_32_tapped_hole2.mirror(Plane(origin=(0, 0, 0), x_dir=(0, 0, 1), z_dir=(1, 0, 0))), mode=Mode.SUBTRACT)

    # Mirror1 copy 1 sketch → Mirror1 copy 1 (revolve, cut)
    with BuildSketch(Plane(origin=(-190.5, 50.8, -3.175), x_dir=(0, 0, -1), z_dir=(0, 1, 0))):
        Polygon((0, 0), (0, -10.21069403), (1.35255, -9.398), (1.35255, -7.112), (1.7526, -7.112), (1.7526, 0), align=None)
    revolve(axis=Axis((-196.85, 50.8, -3.175), (-1, 0, 0)), mode=Mode.SUBTRACT)


solid = part.part
